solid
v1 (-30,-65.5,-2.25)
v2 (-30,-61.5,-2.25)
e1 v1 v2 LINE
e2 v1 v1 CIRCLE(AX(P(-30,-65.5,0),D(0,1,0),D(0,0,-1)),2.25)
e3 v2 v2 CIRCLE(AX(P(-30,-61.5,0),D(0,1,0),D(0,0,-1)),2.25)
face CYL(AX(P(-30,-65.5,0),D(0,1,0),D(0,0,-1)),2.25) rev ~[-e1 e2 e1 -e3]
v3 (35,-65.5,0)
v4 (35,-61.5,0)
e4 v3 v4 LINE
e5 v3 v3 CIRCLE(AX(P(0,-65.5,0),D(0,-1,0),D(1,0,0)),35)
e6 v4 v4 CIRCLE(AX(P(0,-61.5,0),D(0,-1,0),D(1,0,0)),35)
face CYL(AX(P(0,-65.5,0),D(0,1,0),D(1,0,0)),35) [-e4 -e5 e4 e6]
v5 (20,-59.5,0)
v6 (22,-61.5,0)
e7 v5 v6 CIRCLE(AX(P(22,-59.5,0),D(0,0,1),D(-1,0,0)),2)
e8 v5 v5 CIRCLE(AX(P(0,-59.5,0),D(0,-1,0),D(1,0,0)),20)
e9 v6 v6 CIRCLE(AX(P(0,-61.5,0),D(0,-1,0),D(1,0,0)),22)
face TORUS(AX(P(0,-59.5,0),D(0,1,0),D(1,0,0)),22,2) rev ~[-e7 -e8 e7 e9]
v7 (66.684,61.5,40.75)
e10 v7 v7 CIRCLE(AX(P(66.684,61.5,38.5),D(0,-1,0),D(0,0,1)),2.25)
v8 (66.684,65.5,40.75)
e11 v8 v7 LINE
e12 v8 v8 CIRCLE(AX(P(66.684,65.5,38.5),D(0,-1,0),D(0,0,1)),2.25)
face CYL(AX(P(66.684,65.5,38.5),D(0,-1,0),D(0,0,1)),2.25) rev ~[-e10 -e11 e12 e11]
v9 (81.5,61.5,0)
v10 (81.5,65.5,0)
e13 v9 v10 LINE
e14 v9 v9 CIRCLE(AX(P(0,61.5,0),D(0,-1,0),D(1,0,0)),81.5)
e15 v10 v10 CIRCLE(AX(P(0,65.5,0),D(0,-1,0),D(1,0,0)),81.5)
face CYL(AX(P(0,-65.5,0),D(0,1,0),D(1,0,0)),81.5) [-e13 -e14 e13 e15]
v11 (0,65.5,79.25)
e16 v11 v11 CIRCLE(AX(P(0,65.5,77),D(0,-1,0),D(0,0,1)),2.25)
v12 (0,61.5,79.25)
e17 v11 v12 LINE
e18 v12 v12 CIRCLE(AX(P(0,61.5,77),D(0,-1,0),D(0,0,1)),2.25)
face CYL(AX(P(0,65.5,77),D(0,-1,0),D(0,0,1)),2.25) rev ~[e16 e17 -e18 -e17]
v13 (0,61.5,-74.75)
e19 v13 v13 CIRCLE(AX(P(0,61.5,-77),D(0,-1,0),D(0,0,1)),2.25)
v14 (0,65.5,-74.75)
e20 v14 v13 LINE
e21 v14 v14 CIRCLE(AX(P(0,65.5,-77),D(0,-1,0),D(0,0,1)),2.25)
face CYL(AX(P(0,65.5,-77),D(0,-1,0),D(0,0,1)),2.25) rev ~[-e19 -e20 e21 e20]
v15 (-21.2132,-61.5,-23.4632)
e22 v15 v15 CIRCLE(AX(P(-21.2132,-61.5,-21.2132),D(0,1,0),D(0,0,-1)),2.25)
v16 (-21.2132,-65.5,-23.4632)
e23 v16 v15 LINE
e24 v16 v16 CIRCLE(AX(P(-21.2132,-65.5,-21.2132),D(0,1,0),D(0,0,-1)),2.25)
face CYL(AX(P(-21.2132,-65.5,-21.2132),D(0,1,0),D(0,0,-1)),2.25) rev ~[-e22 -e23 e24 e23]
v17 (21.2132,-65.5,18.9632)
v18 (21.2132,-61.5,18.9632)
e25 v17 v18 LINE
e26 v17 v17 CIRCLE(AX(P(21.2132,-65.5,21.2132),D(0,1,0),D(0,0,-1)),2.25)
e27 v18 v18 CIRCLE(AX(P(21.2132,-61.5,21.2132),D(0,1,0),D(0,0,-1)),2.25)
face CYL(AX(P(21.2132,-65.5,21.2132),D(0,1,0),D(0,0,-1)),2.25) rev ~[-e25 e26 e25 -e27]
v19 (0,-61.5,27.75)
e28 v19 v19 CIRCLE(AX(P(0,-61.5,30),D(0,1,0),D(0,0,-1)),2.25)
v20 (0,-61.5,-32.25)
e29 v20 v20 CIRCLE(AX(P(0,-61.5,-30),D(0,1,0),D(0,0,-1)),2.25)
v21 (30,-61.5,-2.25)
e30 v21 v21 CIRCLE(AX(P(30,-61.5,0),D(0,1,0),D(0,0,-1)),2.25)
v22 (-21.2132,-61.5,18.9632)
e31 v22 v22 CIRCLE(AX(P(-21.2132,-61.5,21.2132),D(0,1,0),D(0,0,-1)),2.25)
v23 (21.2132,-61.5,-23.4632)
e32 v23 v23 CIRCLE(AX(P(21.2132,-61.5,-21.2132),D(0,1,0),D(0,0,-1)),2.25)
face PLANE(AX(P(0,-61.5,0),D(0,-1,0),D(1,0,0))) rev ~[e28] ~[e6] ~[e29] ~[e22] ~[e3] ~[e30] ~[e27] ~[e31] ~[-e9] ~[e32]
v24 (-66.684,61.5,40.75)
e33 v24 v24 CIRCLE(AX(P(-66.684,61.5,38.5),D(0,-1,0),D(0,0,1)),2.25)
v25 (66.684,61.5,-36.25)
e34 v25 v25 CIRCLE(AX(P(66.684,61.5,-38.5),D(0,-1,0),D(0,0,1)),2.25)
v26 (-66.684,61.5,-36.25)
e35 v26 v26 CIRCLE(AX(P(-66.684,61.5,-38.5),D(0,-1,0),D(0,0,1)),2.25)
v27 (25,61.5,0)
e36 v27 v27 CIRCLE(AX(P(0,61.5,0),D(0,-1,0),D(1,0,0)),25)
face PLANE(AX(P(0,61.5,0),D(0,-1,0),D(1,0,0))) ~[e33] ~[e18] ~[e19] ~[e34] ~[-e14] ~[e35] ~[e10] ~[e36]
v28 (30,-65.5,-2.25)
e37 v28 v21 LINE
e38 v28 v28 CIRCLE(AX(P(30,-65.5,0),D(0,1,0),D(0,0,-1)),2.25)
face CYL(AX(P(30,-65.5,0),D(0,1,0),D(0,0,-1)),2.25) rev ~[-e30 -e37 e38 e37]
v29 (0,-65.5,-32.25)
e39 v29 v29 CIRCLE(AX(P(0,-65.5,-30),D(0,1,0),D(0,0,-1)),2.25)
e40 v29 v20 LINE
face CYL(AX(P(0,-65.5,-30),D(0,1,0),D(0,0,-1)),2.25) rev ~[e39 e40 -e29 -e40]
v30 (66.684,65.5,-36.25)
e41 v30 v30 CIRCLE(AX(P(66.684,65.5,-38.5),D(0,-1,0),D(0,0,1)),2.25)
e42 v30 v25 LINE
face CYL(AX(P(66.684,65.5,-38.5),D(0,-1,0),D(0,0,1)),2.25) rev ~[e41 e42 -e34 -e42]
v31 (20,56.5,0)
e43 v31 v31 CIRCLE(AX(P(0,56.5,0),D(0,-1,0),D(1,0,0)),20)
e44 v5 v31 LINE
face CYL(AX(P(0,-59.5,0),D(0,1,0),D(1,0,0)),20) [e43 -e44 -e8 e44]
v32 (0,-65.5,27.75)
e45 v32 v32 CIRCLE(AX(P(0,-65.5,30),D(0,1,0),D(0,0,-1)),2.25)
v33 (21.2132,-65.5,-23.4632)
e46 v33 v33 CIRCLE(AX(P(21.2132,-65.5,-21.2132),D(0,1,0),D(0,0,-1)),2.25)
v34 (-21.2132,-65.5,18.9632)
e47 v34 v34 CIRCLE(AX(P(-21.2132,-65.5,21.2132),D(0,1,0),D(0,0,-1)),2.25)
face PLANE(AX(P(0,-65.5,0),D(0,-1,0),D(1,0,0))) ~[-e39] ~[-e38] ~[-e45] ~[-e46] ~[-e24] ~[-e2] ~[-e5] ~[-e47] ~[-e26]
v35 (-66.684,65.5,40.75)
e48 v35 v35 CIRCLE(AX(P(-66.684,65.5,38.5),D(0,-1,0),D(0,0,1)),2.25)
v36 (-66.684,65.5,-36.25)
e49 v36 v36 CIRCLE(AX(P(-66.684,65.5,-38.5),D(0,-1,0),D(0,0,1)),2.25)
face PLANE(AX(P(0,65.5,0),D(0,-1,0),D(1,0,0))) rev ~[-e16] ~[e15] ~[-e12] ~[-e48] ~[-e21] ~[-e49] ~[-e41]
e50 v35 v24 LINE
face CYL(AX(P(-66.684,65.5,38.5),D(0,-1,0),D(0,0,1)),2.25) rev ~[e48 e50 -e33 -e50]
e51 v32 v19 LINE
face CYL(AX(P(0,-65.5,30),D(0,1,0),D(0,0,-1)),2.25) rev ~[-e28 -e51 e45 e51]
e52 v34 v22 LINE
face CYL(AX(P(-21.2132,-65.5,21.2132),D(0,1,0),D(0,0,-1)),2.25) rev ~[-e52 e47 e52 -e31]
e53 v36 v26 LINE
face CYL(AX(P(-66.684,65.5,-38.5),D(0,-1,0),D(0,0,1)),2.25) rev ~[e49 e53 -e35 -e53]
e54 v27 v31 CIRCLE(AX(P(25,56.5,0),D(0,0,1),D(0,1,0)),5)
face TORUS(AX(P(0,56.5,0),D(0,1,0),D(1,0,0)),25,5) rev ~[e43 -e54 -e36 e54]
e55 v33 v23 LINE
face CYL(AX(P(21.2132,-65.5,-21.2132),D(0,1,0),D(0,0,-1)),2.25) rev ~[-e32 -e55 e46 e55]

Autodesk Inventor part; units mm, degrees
ref_plane "YZ Plane" through (0, 0, 0) normal (1, 0, 0) x (0, 1, 0)
ref_plane "XZ Plane" through (0, 0, 0) normal (0, 1, 0) x (-1, 0, 0)
ref_plane "XY Plane" through (0, 0, 0) normal (0, 0, 1) x (1, 0, 0)
sketch "Sketch1" plane through (0, 0, 0) normal (0, 0, 1) x (1, 0, 0)
  line L0 (0, 91.7) -> (0, -91.7) construction
  line L1 (-16.3, 0) -> (97.8, 0) construction
  line L2 (0, -65.5) -> (0, 65.5)
  line L3 (0, -65.5) -> (81.5, -65.5)
  line L4 (81.5, -65.5) -> (81.5, 65.5)
  line L5 (81.5, 65.5) -> (0, 65.5)
  point P0 (0, 0)
  dimension "d2" = 131
  dimension "d12" = 81.5
revolve "Revolution1" add sketch "Sketch1" angle 360 about axis through (0, 0, 0) along (0, -1, 0)
sketch "Sketch4" plane through (0, 0, 0) normal (0, 0, 1) x (1, 0, 0)
  line L0 (-81.5, 65.5) -> (81.5, 65.5) construction
  line L1 (-81.5, -65.5) -> (81.5, -65.5) construction
  line L2 (0, 91) -> (0, -91) construction
  line L3 (-114.1, 0) -> (114.1, 0) construction
  line L4 (35, -61.5) -> (22, -61.5)
  line L5 (20, -59.5) -> (20, 56.5)
  line L6 (25, 61.5) -> (81.5, 61.5)
  line L7 (81.5, 65.5) -> (81.5, -65.5) construction
  line L8 (81.5, -65.5) -> (81.5, 61.5)
  arc A0 (20, -59.5) -> (22, -61.5) centre (22, -59.5) ccw
  arc A1 (25, 61.5) -> (20, 56.5) centre (25, 56.5) ccw
  line L9 (35, -65.5) -> (35, -61.5)
  line L10 (-81.5, -65.5) -> (81.5, -65.5) construction
  line L11 (35, -65.5) -> (81.5, -65.5)
  point P0 (0, 0)
  dimension "d35" = 20
  dimension "d36" = 4
  dimension "d37" = 2
  dimension "d39" = 35
  dimension "d40" = 5
revolve "Revolution2" cut sketch "Sketch4" angle 360 about axis through (0, 0, 0) along (0, -1, 0)
sketch "Sketch2" plane through (0, -65.5, 0) normal (0, -1, 0) x (1, 0, 0)
  circle A0 centre (0, 0) radius 81.5 construction
  line L0 (-114.1, 0) -> (114.1, 0) construction
  line L1 (0, 114.1) -> (0, -114.1) construction
  circle A1 centre (0, 0) radius 21.25 construction
  circle A2 centre (0, 0) radius 30 construction
  point P0 (0, 30)
  point P1 (0, 21.25)
  point P2 (-21.2132, 21.2132)
  point P3 (-15.026, 15.026)
  point P4 (-30, 0)
  point P5 (-21.25, 0)
  point P6 (-21.2132, -21.2132)
  point P7 (-15.026, -15.026)
  point P8 (0, -30)
  point P9 (0, -21.25)
  point P10 (21.2132, -21.2132)
  point P11 (15.026, -15.026)
  point P12 (30, 0)
  point P13 (21.25, 0)
  point P14 (21.2132, 21.2132)
  point P15 (15.026, 15.026)
  point P16 (-4.5183, 21.1087)
  dimension "d6" = 42.5
  dimension "d7" = 60
  dimension "d10" = 360
hole "Hole2" at (0, -65.5, 30) at (-21.2132, -65.5, 21.2132) at (-30, -65.5, 0) at (-21.2132, -65.5, -21.2132) at (0, -65.5, -30) at (21.2132, -65.5, -21.2132) at (30, -65.5, 0) at (21.2132, -65.5, 21.2132) direction (0, 1, 0) diameter 4.5 depth 4 clearance for "Socket Head Cap Screw" size "M4" standard "Ansi Metric M Profile"
sketch "Sketch5" plane through (0, 65.5, 0) normal (0, 1, 0) x (1, 0, 0)
  line L0 (0, 114.1) -> (0, -114.1) construction
  line L1 (114.1, 0) -> (-114.1, 0) construction
  circle A0 centre (0, 0) radius 77 construction
  point P0 (0, 77)
  point P1 (-66.684, 38.5)
  point P2 (-66.684, -38.5)
  point P3 (0, -77)
  point P4 (66.684, -38.5)
  point P5 (66.684, 38.5)
  dimension "d45" = 154
  dimension "d43" = 360
hole "Hole3" at (0, 65.5, -77) at (-66.684, 65.5, -38.5) at (-66.684, 65.5, 38.5) at (0, 65.5, 77) at (66.684, 65.5, 38.5) at (66.684, 65.5, -38.5) direction (0, -1, 0) diameter 4.5 depth 4 clearance for "Socket Head Cap Screw" size "M4" standard "Ansi Metric M Profile"
properties part number "Connection_link_2"
